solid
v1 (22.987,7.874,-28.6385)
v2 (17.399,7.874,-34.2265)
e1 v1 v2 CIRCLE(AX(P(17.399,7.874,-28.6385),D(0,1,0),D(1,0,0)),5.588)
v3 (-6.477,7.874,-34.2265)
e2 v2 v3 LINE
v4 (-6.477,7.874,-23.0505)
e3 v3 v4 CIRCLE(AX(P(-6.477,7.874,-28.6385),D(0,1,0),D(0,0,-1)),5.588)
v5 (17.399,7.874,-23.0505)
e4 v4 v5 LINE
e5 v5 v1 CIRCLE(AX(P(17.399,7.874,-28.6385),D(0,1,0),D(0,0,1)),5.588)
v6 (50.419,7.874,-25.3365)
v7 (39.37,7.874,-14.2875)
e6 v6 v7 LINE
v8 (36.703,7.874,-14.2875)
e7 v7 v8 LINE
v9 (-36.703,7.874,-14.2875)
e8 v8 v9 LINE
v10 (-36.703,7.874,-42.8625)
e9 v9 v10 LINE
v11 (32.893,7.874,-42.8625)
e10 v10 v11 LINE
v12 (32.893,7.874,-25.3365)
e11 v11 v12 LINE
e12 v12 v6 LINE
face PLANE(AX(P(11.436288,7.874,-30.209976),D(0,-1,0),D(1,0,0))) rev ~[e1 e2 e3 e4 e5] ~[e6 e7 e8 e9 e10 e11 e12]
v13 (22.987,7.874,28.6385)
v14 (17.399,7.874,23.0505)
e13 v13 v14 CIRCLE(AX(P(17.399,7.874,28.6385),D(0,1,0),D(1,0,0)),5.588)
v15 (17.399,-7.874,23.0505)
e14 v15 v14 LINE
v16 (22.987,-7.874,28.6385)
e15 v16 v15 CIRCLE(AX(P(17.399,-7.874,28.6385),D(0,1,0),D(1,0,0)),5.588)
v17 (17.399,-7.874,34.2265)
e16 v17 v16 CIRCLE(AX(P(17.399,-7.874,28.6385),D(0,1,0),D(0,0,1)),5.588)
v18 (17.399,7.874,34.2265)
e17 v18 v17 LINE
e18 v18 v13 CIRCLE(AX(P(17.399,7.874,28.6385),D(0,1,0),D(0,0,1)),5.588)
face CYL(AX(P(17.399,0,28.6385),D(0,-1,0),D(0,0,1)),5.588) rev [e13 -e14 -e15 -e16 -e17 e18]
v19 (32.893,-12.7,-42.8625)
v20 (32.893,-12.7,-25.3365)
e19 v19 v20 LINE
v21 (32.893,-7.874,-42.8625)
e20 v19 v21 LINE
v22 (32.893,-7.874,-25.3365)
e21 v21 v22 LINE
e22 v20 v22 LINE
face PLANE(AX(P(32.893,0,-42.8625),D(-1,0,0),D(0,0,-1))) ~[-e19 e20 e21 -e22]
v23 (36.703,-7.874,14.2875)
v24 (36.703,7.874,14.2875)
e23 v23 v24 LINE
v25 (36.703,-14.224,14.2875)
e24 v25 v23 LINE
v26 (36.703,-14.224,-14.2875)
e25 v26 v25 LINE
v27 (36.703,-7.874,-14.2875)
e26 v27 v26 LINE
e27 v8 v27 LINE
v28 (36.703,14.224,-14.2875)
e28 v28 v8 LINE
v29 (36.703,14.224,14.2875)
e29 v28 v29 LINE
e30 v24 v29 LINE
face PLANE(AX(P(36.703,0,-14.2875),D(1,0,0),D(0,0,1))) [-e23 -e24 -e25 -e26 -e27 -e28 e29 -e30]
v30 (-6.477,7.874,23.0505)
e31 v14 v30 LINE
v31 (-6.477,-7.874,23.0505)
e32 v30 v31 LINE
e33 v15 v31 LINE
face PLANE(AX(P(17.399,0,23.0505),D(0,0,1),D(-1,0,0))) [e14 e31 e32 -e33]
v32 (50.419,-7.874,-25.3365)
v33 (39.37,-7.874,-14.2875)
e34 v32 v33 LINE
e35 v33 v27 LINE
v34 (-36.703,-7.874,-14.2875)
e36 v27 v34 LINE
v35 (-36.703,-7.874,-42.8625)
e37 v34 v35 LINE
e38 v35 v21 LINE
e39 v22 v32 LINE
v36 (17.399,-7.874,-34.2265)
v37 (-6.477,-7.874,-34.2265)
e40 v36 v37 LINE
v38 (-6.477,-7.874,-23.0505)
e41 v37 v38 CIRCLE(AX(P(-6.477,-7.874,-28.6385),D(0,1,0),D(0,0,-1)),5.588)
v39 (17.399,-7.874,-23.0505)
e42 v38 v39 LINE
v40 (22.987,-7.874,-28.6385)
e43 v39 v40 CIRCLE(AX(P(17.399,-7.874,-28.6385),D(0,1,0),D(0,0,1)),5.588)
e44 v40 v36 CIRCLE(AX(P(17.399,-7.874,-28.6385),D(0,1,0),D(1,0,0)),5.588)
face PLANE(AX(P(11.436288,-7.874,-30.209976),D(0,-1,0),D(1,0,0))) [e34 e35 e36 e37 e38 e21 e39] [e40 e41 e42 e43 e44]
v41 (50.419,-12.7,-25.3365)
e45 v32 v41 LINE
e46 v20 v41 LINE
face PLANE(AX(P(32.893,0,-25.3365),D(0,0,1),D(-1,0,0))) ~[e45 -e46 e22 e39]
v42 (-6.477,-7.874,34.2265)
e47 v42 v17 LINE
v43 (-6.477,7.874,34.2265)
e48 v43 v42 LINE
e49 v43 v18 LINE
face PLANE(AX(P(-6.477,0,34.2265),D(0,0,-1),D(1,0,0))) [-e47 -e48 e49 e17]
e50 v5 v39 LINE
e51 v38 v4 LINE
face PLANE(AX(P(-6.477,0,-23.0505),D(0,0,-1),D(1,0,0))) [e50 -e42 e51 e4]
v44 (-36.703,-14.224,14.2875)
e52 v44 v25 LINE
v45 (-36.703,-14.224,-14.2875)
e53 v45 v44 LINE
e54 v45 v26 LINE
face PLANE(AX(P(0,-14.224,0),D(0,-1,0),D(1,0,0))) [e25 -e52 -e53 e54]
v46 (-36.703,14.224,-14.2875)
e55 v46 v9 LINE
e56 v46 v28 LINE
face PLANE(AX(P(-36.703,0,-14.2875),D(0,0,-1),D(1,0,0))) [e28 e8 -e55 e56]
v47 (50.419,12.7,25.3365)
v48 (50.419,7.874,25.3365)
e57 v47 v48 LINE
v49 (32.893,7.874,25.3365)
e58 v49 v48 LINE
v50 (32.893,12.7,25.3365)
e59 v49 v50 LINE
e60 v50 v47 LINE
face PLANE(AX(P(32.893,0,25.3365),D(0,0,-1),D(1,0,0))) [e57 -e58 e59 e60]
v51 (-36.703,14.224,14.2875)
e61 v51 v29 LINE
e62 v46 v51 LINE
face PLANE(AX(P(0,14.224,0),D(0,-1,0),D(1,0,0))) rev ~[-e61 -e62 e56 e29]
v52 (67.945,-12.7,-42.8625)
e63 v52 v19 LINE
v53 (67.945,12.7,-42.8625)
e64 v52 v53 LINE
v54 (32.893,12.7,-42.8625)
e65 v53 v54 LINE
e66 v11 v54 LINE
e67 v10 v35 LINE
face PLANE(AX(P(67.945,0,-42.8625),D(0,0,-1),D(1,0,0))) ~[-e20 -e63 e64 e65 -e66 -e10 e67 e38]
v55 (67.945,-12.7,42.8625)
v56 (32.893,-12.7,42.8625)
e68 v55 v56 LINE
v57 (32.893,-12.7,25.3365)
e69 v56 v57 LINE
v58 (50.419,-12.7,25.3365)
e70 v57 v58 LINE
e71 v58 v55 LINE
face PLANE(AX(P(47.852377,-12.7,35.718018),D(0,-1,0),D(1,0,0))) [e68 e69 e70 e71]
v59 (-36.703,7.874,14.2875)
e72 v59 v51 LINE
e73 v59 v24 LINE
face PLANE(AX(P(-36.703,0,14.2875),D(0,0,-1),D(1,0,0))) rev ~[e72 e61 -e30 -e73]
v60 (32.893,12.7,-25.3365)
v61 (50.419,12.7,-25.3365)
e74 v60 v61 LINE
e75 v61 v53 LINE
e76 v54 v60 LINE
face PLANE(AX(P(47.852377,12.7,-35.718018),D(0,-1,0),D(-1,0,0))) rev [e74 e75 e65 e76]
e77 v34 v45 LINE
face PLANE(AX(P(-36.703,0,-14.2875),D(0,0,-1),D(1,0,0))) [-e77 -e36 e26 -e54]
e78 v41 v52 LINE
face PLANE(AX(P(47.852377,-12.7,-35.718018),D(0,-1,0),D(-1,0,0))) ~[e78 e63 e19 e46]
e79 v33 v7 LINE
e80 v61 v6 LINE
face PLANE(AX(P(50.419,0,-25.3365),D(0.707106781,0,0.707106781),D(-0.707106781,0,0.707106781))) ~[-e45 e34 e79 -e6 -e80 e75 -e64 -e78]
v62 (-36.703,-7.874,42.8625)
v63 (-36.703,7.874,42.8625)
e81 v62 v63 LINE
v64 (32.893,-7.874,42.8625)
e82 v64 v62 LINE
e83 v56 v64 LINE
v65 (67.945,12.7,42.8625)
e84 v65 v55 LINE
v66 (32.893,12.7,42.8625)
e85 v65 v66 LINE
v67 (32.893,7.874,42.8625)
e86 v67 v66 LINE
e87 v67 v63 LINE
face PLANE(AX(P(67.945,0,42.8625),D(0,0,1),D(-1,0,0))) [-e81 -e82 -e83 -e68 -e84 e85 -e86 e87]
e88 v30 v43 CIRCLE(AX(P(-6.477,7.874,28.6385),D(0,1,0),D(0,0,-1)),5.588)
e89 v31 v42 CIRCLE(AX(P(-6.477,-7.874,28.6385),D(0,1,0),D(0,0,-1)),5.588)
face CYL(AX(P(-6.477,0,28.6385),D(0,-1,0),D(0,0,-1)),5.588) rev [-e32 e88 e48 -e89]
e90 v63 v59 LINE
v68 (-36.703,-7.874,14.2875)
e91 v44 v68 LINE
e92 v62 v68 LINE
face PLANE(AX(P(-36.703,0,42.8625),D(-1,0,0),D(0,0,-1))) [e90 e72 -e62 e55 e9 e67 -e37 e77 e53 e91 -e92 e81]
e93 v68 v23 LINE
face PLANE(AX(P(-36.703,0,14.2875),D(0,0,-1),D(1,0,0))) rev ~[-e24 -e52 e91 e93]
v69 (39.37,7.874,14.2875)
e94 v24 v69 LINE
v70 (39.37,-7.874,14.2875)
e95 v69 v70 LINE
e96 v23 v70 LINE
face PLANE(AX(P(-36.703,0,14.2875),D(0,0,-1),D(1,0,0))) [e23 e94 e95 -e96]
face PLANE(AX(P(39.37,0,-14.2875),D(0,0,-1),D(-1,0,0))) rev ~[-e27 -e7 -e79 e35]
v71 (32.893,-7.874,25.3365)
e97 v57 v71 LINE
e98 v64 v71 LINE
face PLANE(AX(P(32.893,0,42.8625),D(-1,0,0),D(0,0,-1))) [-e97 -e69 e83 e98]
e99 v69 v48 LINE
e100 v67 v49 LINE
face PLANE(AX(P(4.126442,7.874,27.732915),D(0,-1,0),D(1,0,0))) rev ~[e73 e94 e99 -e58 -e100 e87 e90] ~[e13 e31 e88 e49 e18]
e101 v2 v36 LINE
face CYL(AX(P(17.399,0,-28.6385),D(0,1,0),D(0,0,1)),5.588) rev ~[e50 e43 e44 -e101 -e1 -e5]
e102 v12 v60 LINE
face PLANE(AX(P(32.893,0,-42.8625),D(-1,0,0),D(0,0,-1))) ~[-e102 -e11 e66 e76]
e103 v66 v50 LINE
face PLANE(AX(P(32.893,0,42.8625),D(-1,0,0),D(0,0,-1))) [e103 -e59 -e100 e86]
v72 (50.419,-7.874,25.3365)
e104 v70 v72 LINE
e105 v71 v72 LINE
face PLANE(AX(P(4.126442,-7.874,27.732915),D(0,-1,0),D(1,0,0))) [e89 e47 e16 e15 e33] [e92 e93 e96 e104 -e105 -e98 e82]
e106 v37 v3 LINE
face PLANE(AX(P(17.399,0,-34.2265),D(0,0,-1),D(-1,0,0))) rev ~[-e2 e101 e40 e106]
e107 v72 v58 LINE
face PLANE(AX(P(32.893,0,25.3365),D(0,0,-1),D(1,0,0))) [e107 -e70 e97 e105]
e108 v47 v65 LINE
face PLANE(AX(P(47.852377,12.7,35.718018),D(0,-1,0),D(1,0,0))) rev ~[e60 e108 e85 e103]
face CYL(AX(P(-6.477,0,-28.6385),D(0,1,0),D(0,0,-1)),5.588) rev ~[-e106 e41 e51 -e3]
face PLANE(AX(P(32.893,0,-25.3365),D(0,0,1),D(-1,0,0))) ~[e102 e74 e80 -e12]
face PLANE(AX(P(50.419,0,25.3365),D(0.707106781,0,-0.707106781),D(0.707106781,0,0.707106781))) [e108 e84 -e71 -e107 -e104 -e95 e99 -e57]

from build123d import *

# Parameters (mm, degrees)
F0_W     = 73.406
F0_H     = 28.575
F2_DEPTH = 14.224
F4_DEPTH = 7.874
F5_DEPTH = 12.7


# Not quite as in the source:
# - a pattern or mirror of a feature is missing from the dataset's text; its kind, count and spacing are read off the source's solid
# - a feature names something its author has since deleted; it is built from what else it names


with BuildPart() as f2:
    # F0 (on Front) → F2 (new body, symmetric)
    with BuildSketch(Plane.XZ):
        Rectangle(F0_W, F0_H)
    extrude(amount=F2_DEPTH, both=True)

    # F3 (on Front) → F4 (join, symmetric)
    with BuildSketch(Plane.XZ):
        Polygon((-36.703, -14.2875), (-36.703, -42.8625), (67.945, -42.8625), (39.37, -14.2875), align=None)
        with BuildLine():
            Line((-6.477, -23.0505), (17.399, -23.0505))
            ThreePointArc((17.399, -23.0505), (21.3503126933, -24.6871873067), (22.987, -28.6385))
            ThreePointArc((22.987, -28.6385), (21.3503126933, -32.5898126933), (17.399, -34.2265))
            Line((17.399, -34.2265), (-6.477, -34.2265))
            ThreePointArc((-6.477, -34.2265), (-12.065, -28.6385), (-6.477, -23.0505))
        make_face(mode=Mode.SUBTRACT)
        Polygon((-36.703, 14.2875), (36.703, 14.2875), (39.37, 14.2875), (50.419, 25.3365), (32.893, 25.3365), (32.893, 42.8625), (-36.703, 42.8625), align=None)
        with BuildLine():
            ThreePointArc((-6.477, 23.0505), (-12.065, 28.6385), (-6.477, 34.2265))
            Line((-6.477, 34.2265), (17.399, 34.2265))
            ThreePointArc((17.399, 34.2265), (21.3503126933, 32.5898126933), (22.987, 28.6385))
            ThreePointArc((22.987, 28.6385), (21.3503126933, 24.6871873067), (17.399, 23.0505))
            Line((17.399, 23.0505), (-6.477, 23.0505))
        make_face(mode=Mode.SUBTRACT)
        Polygon((32.893, 25.3365), (50.419, 25.3365), (67.945, 42.8625), (32.893, 42.8625), align=None)
    extrude(amount=F4_DEPTH, both=True)

    # F3 (on Front) → F5 (join, symmetric)
    with BuildSketch(Plane.XZ):
        Polygon((32.893, 25.3365), (50.419, 25.3365), (67.945, 42.8625), (32.893, 42.8625), align=None)
    f5 = extrude(amount=F5_DEPTH, both=True)

    # F5_copies: F5 across plane
    add(f5.mirror(Plane(origin=(0, 0, 0), x_dir=(-1, 0, 0), z_dir=(0, 0, -1))))


solid = f2.part
